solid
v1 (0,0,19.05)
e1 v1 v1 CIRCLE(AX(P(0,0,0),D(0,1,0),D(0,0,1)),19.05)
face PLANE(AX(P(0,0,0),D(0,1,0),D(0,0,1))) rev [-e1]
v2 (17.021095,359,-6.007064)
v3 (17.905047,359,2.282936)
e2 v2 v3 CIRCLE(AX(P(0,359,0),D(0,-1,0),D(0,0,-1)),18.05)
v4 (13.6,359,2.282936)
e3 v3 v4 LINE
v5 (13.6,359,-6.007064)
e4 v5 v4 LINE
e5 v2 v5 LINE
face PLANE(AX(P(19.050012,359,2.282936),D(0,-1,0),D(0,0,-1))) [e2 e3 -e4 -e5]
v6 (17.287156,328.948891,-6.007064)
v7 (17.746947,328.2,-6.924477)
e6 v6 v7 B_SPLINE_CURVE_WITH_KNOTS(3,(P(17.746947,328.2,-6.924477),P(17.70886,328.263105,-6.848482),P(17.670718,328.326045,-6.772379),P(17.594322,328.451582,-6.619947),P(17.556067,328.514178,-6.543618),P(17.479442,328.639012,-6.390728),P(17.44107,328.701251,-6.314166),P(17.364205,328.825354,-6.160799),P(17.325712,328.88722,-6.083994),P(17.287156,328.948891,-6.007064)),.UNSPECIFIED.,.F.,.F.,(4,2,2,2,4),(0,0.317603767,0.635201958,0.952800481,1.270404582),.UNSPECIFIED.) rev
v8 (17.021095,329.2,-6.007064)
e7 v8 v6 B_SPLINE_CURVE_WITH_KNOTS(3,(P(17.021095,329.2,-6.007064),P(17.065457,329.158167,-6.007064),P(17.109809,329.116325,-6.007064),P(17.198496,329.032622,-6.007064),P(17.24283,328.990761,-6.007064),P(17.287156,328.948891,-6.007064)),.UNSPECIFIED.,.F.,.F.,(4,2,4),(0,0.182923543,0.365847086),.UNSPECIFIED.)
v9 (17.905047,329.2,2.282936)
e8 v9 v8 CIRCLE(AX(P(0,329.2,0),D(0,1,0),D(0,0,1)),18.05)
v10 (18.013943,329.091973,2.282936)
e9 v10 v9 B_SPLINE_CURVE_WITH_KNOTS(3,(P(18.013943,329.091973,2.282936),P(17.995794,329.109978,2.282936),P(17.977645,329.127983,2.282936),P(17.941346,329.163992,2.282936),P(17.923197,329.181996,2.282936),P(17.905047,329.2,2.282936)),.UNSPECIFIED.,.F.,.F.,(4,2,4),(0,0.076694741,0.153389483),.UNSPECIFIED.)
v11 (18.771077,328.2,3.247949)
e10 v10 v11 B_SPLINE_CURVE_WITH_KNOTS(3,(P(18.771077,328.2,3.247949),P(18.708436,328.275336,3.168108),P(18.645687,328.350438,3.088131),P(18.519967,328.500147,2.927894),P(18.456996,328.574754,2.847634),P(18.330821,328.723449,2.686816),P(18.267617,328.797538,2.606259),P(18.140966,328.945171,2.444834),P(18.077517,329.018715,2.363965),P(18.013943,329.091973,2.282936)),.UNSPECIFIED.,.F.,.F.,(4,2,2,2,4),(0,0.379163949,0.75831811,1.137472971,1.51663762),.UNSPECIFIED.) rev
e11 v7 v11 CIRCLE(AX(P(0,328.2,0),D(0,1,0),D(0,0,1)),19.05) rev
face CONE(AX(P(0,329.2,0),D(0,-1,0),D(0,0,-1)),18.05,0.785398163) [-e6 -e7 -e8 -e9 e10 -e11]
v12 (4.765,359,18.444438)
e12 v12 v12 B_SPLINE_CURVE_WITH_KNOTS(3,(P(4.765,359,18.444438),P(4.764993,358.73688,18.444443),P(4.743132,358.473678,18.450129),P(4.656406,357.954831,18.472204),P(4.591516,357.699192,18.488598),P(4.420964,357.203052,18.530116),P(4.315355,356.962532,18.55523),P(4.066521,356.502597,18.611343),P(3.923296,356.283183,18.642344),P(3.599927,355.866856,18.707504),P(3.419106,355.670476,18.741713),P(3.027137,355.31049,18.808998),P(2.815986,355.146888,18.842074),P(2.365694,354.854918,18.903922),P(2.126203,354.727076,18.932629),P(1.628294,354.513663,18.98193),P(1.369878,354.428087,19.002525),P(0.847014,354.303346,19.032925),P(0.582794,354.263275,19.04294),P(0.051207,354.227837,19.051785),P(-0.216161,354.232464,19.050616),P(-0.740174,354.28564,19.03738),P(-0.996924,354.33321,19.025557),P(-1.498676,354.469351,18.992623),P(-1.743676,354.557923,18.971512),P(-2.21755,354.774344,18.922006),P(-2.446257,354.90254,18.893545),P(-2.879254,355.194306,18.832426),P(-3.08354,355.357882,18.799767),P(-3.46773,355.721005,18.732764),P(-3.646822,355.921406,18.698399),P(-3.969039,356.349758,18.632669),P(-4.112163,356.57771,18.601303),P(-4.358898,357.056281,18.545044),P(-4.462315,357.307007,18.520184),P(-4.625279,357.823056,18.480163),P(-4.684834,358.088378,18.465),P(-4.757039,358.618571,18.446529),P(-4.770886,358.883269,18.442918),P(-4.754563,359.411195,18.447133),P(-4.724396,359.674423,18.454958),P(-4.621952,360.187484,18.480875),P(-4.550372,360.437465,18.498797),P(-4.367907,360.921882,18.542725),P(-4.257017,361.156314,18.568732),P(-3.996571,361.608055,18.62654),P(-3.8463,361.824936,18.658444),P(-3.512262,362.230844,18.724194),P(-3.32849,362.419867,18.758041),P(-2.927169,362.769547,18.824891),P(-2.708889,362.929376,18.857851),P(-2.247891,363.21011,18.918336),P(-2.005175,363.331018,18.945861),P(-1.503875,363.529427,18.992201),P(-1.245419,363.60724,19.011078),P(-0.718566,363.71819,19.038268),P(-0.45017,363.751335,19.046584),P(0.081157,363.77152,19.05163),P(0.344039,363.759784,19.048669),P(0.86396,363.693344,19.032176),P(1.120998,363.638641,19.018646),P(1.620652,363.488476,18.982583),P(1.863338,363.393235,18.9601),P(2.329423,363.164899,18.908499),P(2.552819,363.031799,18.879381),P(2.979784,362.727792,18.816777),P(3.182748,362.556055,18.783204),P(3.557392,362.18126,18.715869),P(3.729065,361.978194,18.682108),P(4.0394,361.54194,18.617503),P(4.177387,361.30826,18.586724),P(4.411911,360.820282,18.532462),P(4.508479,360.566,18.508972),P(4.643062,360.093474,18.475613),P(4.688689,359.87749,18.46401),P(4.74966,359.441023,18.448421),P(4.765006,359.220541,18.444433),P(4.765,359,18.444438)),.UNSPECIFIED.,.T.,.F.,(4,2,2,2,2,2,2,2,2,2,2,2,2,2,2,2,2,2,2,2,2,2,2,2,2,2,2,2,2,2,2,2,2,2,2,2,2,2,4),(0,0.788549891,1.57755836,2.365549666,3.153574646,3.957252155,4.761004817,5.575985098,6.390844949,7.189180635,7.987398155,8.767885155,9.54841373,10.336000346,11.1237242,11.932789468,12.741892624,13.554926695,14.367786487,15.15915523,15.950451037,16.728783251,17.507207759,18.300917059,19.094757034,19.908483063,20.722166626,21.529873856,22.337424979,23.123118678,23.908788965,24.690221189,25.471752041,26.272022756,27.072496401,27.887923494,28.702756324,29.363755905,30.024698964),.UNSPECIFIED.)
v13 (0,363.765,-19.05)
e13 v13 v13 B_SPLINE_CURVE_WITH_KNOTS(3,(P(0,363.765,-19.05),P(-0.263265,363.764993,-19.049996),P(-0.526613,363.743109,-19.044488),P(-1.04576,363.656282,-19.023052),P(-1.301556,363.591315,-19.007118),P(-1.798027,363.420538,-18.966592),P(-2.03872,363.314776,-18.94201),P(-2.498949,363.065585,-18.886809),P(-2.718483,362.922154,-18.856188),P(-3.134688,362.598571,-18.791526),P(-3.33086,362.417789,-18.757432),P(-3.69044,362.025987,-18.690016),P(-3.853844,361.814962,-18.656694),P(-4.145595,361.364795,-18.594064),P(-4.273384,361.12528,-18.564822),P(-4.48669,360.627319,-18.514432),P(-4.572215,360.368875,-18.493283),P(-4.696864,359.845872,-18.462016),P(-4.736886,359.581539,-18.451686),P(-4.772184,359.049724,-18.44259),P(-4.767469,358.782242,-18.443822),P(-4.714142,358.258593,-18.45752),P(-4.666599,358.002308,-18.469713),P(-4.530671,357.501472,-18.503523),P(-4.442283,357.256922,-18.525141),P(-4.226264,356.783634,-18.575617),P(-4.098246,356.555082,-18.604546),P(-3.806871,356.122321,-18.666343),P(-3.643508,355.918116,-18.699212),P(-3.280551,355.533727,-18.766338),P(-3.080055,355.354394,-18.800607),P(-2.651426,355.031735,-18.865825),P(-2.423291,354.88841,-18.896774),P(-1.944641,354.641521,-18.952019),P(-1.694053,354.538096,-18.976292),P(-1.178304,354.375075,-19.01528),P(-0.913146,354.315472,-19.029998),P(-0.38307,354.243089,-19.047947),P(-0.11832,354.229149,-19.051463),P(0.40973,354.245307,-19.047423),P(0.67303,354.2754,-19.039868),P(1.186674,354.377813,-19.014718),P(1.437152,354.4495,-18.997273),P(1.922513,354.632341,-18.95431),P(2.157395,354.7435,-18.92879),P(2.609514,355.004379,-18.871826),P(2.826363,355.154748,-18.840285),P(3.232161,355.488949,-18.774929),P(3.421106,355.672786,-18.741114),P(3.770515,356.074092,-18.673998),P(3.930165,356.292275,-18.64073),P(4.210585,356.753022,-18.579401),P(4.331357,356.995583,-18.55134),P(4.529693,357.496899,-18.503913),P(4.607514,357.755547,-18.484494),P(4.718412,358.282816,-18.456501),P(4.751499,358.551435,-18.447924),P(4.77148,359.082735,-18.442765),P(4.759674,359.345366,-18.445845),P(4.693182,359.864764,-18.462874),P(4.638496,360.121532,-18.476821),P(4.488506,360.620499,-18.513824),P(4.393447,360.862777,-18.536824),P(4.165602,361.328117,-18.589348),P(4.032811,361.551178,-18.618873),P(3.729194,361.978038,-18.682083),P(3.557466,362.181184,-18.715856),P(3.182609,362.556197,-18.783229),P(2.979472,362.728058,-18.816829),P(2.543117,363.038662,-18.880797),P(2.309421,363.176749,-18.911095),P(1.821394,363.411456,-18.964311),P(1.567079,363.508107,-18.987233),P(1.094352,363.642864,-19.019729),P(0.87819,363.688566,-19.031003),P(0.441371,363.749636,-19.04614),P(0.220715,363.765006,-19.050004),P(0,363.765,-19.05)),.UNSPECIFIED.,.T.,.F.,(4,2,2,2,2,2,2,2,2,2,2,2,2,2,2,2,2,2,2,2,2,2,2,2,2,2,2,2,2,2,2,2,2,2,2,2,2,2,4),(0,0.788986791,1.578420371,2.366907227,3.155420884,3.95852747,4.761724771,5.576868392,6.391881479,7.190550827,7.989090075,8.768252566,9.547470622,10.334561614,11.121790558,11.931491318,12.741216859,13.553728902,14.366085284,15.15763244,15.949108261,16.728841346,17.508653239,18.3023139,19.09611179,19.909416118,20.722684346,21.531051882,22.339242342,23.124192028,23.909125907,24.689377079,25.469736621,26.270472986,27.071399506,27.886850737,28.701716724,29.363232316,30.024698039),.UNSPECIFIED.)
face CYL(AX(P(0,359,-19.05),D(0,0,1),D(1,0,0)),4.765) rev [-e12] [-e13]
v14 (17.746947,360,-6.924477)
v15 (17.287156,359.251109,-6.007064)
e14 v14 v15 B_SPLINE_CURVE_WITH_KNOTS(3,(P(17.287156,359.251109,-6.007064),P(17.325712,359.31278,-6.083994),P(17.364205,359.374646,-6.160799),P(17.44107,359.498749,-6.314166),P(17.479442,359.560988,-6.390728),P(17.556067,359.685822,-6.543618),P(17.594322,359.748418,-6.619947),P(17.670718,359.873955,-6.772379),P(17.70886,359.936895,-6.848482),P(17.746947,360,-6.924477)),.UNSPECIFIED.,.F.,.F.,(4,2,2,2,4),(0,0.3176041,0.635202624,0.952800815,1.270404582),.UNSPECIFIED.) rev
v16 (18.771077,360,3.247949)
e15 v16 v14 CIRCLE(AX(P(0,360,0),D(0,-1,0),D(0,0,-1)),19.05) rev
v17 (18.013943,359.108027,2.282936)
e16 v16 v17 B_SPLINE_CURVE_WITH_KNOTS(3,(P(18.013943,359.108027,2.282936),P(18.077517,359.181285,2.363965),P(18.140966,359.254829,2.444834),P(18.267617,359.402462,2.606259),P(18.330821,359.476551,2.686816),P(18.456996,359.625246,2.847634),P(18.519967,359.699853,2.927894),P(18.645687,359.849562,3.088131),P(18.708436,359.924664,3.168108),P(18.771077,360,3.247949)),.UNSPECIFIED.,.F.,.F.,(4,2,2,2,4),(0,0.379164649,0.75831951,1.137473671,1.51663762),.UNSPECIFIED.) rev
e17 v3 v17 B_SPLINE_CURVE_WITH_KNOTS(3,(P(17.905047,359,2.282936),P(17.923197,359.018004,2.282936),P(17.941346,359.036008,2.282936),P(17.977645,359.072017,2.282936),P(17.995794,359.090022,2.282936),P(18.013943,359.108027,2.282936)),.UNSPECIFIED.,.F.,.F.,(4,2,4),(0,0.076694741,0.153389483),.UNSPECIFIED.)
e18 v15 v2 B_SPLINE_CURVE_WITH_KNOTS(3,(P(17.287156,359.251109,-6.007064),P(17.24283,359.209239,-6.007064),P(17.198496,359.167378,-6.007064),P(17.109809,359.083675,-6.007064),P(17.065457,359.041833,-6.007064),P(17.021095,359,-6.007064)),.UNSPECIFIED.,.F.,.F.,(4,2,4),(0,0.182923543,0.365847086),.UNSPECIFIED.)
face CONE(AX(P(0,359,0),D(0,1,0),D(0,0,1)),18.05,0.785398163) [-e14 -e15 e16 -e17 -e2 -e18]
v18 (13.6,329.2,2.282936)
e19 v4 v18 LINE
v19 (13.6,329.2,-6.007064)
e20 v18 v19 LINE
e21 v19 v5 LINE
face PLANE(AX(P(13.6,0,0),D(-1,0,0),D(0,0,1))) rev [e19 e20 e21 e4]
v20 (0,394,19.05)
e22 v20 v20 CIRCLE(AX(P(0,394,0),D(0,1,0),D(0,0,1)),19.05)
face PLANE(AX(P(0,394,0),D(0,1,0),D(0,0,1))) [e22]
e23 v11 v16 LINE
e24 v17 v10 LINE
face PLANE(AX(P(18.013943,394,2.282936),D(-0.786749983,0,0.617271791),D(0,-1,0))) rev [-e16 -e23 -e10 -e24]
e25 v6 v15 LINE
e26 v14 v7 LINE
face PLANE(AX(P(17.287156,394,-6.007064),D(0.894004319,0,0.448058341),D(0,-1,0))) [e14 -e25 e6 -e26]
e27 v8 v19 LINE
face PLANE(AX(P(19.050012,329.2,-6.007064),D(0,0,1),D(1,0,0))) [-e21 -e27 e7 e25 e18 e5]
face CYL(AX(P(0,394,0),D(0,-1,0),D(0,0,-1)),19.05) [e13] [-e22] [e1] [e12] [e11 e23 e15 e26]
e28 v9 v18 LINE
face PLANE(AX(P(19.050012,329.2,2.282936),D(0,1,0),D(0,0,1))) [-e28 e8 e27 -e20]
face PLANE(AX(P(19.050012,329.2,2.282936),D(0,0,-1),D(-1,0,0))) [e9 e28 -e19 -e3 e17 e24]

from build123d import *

# Parameters (mm, degrees)
CROQUIS1_R                 = 19.05
SALIENTE_EXTRUIR1_DEPTH    = 394
CORTAR_EXTRUIR1_DEPTH      = 395.919998227
CORTAR_EXTRUIR1_DEPTH_BACK = 395.919998227
CROQUIS2_R                 = 4.765
CORTAR_EXTRUIR2_DEPTH      = 397.295991136
CORTAR_EXTRUIR2_DEPTH_BACK = 5.45
CROQUIS4_W                 = 8.29
CROQUIS4_H                 = 29.8
CHAFL_N1_SIZE              = 1
CHAFL_N1_SIZE_2            = 0.898769363
CHAFL_N1_SIZE_3            = 0.790943361


with BuildPart() as part:
    # Croquis1 → Saliente-Extruir1 (new body)
    with BuildSketch(Plane(origin=(0, 0, 0), x_dir=(1, 0, 0), z_dir=(0, 1, 0))):
        with Locations(Location((0, 0, 0), (0, 0, 270))):
            Circle(CROQUIS1_R)
    extrude(amount=SALIENTE_EXTRUIR1_DEPTH)

    # Croquis2 → Cortar-Extruir1 (cut, two sides: drawn at the far end of the back side and taken through both)
    with BuildSketch(Plane.XY.offset(-CORTAR_EXTRUIR1_DEPTH_BACK)):
        with Locations(Location((0, 359, 0), (0, 0, 90.000000003))):
            Circle(CROQUIS2_R)
    extrude(amount=CORTAR_EXTRUIR1_DEPTH + CORTAR_EXTRUIR1_DEPTH_BACK, mode=Mode.SUBTRACT)

    # Croquis4 → Cortar-Extruir2 (cut, two sides: drawn at the far end of the back side and taken through both)
    with BuildSketch(Plane(origin=(19.05, 0, 0), x_dir=(0, 0, -1), z_dir=(1, 0, 0)).offset(-CORTAR_EXTRUIR2_DEPTH_BACK)):
        with Locations((1.862063648, 344.1)):
            Rectangle(CROQUIS4_W, CROQUIS4_H)
    extrude(amount=CORTAR_EXTRUIR2_DEPTH + CORTAR_EXTRUIR2_DEPTH_BACK, mode=Mode.SUBTRACT)

    # Chaflán1
    # the kernel refuses this chamfer: 1, 0.898769363, 0.790943361 mm, written as the material it takes off along each edge
    with BuildSketch(Plane(origin=(0, 329.2, 0), x_dir=(0.8979062520865971, 0, -0.4401867359017083), z_dir=(-0.4401867359017083, 0, -0.8979062520865971))) as chafl_n1_piece_1_section:
        Polygon((19.05, CHAFL_N1_SIZE), (19.05 - CHAFL_N1_SIZE, 0), (19.05, 0), align=None)
    chafl_n1_piece_1 = revolve(axis=Axis((0, 329.2, 0), (0, -1, 0)), revolution_arc=40.733590892, mode=Mode.PRIVATE)
    chafl_n1_piece_1 = split(chafl_n1_piece_1, bisect_by=Plane(origin=(0, 329.2, 2.282936352), z_dir=(0, 0, -1)), keep=Keep.TOP, mode=Mode.PRIVATE)
    chafl_n1_piece_1 = split(chafl_n1_piece_1, bisect_by=Plane(origin=(0, 329.2, -6.007063648), z_dir=(0, 0, 1)), keep=Keep.TOP, mode=Mode.PRIVATE)
    add(chafl_n1_piece_1, mode=Mode.SUBTRACT)
    with BuildSketch(Plane(origin=(0, 359, 0), x_dir=(0.8979062520865971, 0, -0.4401867359017083), z_dir=(-0.4401867359017083, 0, -0.8979062520865971))) as chafl_n1_piece_2_section:
        Polygon((19.05, -CHAFL_N1_SIZE), (19.05 - CHAFL_N1_SIZE, 0), (19.05, 0), align=None)
    chafl_n1_piece_2 = revolve(axis=Axis((0, 359, 0), (0, -1, 0)), revolution_arc=40.733590892, mode=Mode.PRIVATE)
    chafl_n1_piece_2 = split(chafl_n1_piece_2, bisect_by=Plane(origin=(0, 359, 2.282936352), z_dir=(0, 0, -1)), keep=Keep.TOP, mode=Mode.PRIVATE)
    chafl_n1_piece_2 = split(chafl_n1_piece_2, bisect_by=Plane(origin=(0, 359, -6.007063648), z_dir=(0, 0, 1)), keep=Keep.TOP, mode=Mode.PRIVATE)
    add(chafl_n1_piece_2, mode=Mode.SUBTRACT)
    with BuildSketch(Plane(origin=(18.912712698, 359, 2.282936352), x_dir=(-0.1452151757871569, 0, 0.9894000973929127), z_dir=(0, -1, 0))) as chafl_n1_piece_3:
        with BuildLine():
            Line((0.975350899, 0), (CHAFL_N1_SIZE_2 * 0.14521517582, CHAFL_N1_SIZE_2 * 0.989400097614))
            Line((CHAFL_N1_SIZE_2 * 0.14521517582, CHAFL_N1_SIZE_2 * 0.989400097614), (0, 0))
            ThreePointArc((0, 0), (0.501444944, -0.006238234), (0.975350899, 0))
        make_face()
    extrude(amount=29.8, mode=Mode.SUBTRACT)
    with BuildSketch(Plane(origin=(18.078099633, 359, -6.007063648), x_dir=(-0.33952178475198846, 0, -0.9405981914073748), z_dir=(0, -1, 0))) as chafl_n1_piece_4:
        with BuildLine():
            Line((0.975350899, 0), (CHAFL_N1_SIZE_3 * 0.339521784837, -CHAFL_N1_SIZE_3 * 0.940598191643))
            Line((CHAFL_N1_SIZE_3 * 0.339521784837, -CHAFL_N1_SIZE_3 * 0.940598191643), (0, 0))
            ThreePointArc((0, 0), (0.501444944, 0.006238234), (0.975350899, 0))
        make_face()
    extrude(amount=29.8, mode=Mode.SUBTRACT)
    with BuildSketch(Plane(origin=(0, 329.2, 0), x_dir=(0.8979062520865971, 0, -0.4401867359017083), z_dir=(-0.4401867359017083, 0, -0.8979062520865971))) as chafl_n1_piece_5a_section:
        Polygon((19.05, CHAFL_N1_SIZE), (19.05 - CHAFL_N1_SIZE, 0), (19.05, 0), align=None)
    chafl_n1_piece_5a = revolve(axis=Axis((0, 329.2, 0), (0, -1, 0)), revolution_arc=40.733590892, mode=Mode.PRIVATE)
    chafl_n1_piece_5a = split(chafl_n1_piece_5a, bisect_by=Plane(origin=(0, 329.2, -6.007063648), z_dir=(0, 0, -1)), keep=Keep.TOP, mode=Mode.PRIVATE)
    with BuildSketch(Plane(origin=(18.078099633, 359, -6.007063648), x_dir=(-0.33952178475198846, 0, -0.9405981914073748), z_dir=(0, -1, 0))) as chafl_n1_piece_5b_section:
        with BuildLine():
            Line((0.975350899, 0), (CHAFL_N1_SIZE_3 * 0.339521784837, -CHAFL_N1_SIZE_3 * 0.940598191643))
            Line((CHAFL_N1_SIZE_3 * 0.339521784837, -CHAFL_N1_SIZE_3 * 0.940598191643), (0, 0))
            ThreePointArc((0, 0), (0.501444944, 0.006238234), (0.975350899, 0))
        make_face()
    chafl_n1_piece_5b = extrude(amount=32.308302498, mode=Mode.PRIVATE)
    chafl_n1_piece_5b = split(chafl_n1_piece_5b, bisect_by=Plane(origin=(18.078099633, 329.2, -6.007063648), z_dir=(0, -1, 0)), keep=Keep.TOP, mode=Mode.PRIVATE)
    chafl_n1_piece_5 = chafl_n1_piece_5a & chafl_n1_piece_5b
    add(chafl_n1_piece_5, mode=Mode.SUBTRACT)
    with BuildSketch(Plane(origin=(0, 329.2, 0), x_dir=(0.8979062520865971, 0, -0.4401867359017083), z_dir=(-0.4401867359017083, 0, -0.8979062520865971))) as chafl_n1_piece_6a_section:
        Polygon((19.05, CHAFL_N1_SIZE), (19.05 - CHAFL_N1_SIZE, 0), (19.05, 0), align=None)
    chafl_n1_piece_6a = revolve(axis=Axis((0, 329.2, 0), (0, -1, 0)), revolution_arc=40.733590892, mode=Mode.PRIVATE)
    chafl_n1_piece_6a = split(chafl_n1_piece_6a, bisect_by=Plane(origin=(0, 329.2, 2.282936352), z_dir=(0, 0, 1)), keep=Keep.TOP, mode=Mode.PRIVATE)
    with BuildSketch(Plane(origin=(18.912712698, 359, 2.282936352), x_dir=(-0.1452151757871569, 0, 0.9894000973929127), z_dir=(0, -1, 0))) as chafl_n1_piece_6b_section:
        with BuildLine():
            Line((0.975350899, 0), (CHAFL_N1_SIZE_2 * 0.14521517582, CHAFL_N1_SIZE_2 * 0.989400097614))
            Line((CHAFL_N1_SIZE_2 * 0.14521517582, CHAFL_N1_SIZE_2 * 0.989400097614), (0, 0))
            ThreePointArc((0, 0), (0.501444944, -0.006238234), (0.975350899, 0))
        make_face()
    chafl_n1_piece_6b = extrude(amount=32.308302498, mode=Mode.PRIVATE)
    chafl_n1_piece_6b = split(chafl_n1_piece_6b, bisect_by=Plane(origin=(18.912712698, 329.2, 2.282936352), z_dir=(0, -1, 0)), keep=Keep.TOP, mode=Mode.PRIVATE)
    chafl_n1_piece_6 = chafl_n1_piece_6a & chafl_n1_piece_6b
    add(chafl_n1_piece_6, mode=Mode.SUBTRACT)
    with BuildSketch(Plane(origin=(0, 359, 0), x_dir=(0.8979062520865971, 0, -0.4401867359017083), z_dir=(-0.4401867359017083, 0, -0.8979062520865971))) as chafl_n1_piece_7a_section:
        Polygon((19.05, -CHAFL_N1_SIZE), (19.05 - CHAFL_N1_SIZE, 0), (19.05, 0), align=None)
    chafl_n1_piece_7a = revolve(axis=Axis((0, 359, 0), (0, -1, 0)), revolution_arc=40.733590892, mode=Mode.PRIVATE)
    chafl_n1_piece_7a = split(chafl_n1_piece_7a, bisect_by=Plane(origin=(0, 359, -6.007063648), z_dir=(0, 0, -1)), keep=Keep.TOP, mode=Mode.PRIVATE)
    with BuildSketch(Plane(origin=(18.078099633, 361.508302498, -6.007063648), x_dir=(-0.33952178475198846, 0, -0.9405981914073748), z_dir=(0, -1, 0))) as chafl_n1_piece_7b_section:
        with BuildLine():
            Line((0.975350899, 0), (CHAFL_N1_SIZE_3 * 0.339521784837, -CHAFL_N1_SIZE_3 * 0.940598191643))
            Line((CHAFL_N1_SIZE_3 * 0.339521784837, -CHAFL_N1_SIZE_3 * 0.940598191643), (0, 0))
            ThreePointArc((0, 0), (0.501444944, 0.006238234), (0.975350899, 0))
        make_face()
    chafl_n1_piece_7b = extrude(amount=32.308302498, mode=Mode.PRIVATE)
    chafl_n1_piece_7b = split(chafl_n1_piece_7b, bisect_by=Plane(origin=(18.078099633, 359, -6.007063648), z_dir=(0, 1, 0)), keep=Keep.TOP, mode=Mode.PRIVATE)
    chafl_n1_piece_7 = chafl_n1_piece_7a & chafl_n1_piece_7b
    add(chafl_n1_piece_7, mode=Mode.SUBTRACT)
    with BuildSketch(Plane(origin=(18.912712698, 361.508302498, 2.282936352), x_dir=(-0.1452151757871569, 0, 0.9894000973929127), z_dir=(0, -1, 0))) as chafl_n1_piece_8a_section:
        with BuildLine():
            Line((0.975350899, 0), (CHAFL_N1_SIZE_2 * 0.14521517582, CHAFL_N1_SIZE_2 * 0.989400097614))
            Line((CHAFL_N1_SIZE_2 * 0.14521517582, CHAFL_N1_SIZE_2 * 0.989400097614), (0, 0))
            ThreePointArc((0, 0), (0.501444944, -0.006238234), (0.975350899, 0))
        make_face()
    chafl_n1_piece_8a = extrude(amount=32.308302498, mode=Mode.PRIVATE)
    chafl_n1_piece_8a = split(chafl_n1_piece_8a, bisect_by=Plane(origin=(18.912712698, 359, 2.282936352), z_dir=(0, 1, 0)), keep=Keep.TOP, mode=Mode.PRIVATE)
    with BuildSketch(Plane(origin=(0, 359, 0), x_dir=(0.8979062520865971, 0, -0.4401867359017083), z_dir=(-0.4401867359017083, 0, -0.8979062520865971))) as chafl_n1_piece_8b_section:
        Polygon((19.05, -CHAFL_N1_SIZE), (19.05 - CHAFL_N1_SIZE, 0), (19.05, 0), align=None)
    chafl_n1_piece_8b = revolve(axis=Axis((0, 359, 0), (0, -1, 0)), revolution_arc=40.733590892, mode=Mode.PRIVATE)
    chafl_n1_piece_8b = split(chafl_n1_piece_8b, bisect_by=Plane(origin=(0, 359, 2.282936352), z_dir=(0, 0, 1)), keep=Keep.TOP, mode=Mode.PRIVATE)
    chafl_n1_piece_8 = chafl_n1_piece_8a & chafl_n1_piece_8b
    add(chafl_n1_piece_8, mode=Mode.SUBTRACT)


solid = part.part
